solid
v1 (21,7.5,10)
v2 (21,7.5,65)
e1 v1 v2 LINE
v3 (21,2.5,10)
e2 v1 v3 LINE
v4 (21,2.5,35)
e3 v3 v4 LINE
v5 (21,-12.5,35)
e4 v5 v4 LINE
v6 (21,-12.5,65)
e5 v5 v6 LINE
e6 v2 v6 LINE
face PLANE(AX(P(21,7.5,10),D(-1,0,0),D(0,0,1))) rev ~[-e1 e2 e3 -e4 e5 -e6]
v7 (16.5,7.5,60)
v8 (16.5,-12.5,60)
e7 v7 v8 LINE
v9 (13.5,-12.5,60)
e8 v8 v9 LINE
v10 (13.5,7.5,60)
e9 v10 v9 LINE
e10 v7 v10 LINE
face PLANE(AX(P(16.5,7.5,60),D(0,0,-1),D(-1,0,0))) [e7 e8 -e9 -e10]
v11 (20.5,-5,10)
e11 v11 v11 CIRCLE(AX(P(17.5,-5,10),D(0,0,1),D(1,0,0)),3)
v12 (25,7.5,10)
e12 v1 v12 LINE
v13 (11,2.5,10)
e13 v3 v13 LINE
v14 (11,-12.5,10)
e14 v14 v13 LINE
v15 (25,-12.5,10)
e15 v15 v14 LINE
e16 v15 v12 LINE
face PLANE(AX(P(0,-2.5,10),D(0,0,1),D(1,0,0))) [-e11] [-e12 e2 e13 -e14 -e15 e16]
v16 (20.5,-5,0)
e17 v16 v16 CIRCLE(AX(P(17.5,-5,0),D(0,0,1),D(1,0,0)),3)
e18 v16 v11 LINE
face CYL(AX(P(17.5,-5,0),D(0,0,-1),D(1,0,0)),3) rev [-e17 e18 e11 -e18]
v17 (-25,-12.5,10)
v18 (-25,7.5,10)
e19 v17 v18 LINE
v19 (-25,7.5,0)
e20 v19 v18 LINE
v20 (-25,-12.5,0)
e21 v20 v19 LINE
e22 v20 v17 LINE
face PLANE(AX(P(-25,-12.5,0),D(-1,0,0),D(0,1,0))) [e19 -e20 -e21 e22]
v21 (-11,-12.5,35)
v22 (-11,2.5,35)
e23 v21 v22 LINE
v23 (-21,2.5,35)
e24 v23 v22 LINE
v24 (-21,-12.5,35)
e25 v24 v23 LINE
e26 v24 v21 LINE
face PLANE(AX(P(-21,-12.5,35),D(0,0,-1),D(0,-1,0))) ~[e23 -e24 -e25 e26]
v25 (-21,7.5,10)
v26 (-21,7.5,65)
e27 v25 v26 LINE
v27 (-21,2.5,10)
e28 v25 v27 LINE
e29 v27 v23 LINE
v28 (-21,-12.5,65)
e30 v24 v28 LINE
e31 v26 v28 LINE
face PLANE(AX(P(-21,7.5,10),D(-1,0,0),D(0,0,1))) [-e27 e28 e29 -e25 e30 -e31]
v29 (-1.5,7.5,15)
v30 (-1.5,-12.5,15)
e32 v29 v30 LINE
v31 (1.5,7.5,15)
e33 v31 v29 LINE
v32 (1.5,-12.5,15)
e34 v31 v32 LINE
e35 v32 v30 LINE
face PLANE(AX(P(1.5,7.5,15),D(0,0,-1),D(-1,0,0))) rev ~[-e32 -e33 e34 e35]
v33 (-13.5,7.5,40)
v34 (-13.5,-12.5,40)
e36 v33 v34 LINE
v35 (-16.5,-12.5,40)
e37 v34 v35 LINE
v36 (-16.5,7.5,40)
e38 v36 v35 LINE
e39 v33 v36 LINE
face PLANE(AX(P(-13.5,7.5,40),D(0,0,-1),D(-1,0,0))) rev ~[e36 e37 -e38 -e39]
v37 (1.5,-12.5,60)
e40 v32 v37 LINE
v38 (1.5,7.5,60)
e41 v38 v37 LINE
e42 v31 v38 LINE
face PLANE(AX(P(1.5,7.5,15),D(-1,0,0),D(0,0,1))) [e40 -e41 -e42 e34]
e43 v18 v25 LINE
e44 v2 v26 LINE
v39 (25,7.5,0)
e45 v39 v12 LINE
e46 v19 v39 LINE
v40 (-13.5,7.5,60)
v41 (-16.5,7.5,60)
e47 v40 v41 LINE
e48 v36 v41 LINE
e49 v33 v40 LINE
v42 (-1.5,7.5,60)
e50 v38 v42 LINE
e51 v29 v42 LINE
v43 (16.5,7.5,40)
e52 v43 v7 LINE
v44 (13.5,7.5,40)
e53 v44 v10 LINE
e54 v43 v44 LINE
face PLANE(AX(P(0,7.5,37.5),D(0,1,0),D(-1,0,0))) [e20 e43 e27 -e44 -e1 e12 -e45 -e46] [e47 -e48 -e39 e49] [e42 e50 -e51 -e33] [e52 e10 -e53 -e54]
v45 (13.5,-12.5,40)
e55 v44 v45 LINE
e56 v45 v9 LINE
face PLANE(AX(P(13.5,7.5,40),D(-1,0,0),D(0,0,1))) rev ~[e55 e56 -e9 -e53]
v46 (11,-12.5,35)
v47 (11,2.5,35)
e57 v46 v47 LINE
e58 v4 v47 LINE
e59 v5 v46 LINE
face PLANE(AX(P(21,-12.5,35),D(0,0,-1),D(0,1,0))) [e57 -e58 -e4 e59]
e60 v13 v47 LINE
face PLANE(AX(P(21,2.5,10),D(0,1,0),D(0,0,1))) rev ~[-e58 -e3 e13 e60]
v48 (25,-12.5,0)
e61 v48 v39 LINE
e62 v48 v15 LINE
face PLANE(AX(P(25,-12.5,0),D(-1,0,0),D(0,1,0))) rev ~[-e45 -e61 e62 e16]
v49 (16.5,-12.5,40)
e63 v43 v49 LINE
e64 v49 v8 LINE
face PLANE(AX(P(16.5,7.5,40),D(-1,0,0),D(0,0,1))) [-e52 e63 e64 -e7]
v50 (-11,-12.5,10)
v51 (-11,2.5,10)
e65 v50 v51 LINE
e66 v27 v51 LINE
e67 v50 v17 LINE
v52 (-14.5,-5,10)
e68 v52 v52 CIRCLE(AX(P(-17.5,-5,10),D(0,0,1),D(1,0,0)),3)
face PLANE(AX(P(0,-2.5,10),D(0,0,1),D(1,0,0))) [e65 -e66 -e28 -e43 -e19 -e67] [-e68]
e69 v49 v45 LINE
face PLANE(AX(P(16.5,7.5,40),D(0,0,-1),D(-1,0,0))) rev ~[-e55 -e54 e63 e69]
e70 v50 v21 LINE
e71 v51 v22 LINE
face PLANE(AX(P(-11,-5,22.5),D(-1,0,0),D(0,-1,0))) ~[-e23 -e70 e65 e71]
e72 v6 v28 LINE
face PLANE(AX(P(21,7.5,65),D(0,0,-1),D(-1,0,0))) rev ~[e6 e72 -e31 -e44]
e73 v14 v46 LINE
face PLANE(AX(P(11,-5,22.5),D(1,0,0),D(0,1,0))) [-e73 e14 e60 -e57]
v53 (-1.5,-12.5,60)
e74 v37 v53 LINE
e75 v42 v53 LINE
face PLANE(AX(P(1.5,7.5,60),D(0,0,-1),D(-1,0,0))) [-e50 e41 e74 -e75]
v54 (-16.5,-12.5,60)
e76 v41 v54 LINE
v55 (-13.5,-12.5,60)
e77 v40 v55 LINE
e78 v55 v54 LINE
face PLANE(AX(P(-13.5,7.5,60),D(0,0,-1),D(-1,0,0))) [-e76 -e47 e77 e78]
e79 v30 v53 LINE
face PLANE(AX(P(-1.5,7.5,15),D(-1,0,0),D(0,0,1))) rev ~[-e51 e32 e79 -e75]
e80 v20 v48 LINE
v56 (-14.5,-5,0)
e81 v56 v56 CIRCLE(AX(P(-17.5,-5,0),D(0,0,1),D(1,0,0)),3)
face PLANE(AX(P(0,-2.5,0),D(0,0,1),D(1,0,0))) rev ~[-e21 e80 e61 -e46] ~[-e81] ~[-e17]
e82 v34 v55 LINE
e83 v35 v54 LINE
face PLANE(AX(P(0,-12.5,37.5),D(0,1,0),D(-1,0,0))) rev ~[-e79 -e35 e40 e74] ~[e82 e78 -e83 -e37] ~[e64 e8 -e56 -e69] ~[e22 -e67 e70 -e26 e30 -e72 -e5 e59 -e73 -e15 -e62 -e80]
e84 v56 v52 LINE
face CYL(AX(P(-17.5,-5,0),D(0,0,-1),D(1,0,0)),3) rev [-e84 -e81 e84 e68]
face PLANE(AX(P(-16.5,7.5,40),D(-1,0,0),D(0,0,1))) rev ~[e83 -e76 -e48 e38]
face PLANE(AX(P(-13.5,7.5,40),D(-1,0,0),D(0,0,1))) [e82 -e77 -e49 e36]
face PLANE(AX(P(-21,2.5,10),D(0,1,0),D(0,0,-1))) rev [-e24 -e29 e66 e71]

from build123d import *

# Parameters (mm, degrees)
F0_W     = 50
F0_H     = 20
F0_R     = 3
F1_DEPTH = 10
F2_W     = 42
F2_H     = 55
F3_DEPTH = 20
F4_W     = 3
F4_H     = 20
F4_H_2   = 45
F5_DEPTH = 20
F6_W     = 15
F6_H     = 25
F7_DEPTH = 10


# Not quite as in the source:
# - a pattern or mirror of a feature is missing from the dataset's text; its kind, count and spacing are read off the source's solid


with BuildPart() as f1:
    # F0 (on Top) → F1 (new body)
    with BuildSketch(Plane.XY):
        with Locations((0, -2.5)):
            Rectangle(F0_W, F0_H)
        with Locations((-17.5, -5)):
            Circle(F0_R, mode=Mode.SUBTRACT)
        with Locations((17.5, -5)):
            Circle(F0_R, mode=Mode.SUBTRACT)
    extrude(amount=F1_DEPTH)

    # F2 (on face) → F3 (join)
    with BuildSketch(Plane(origin=(0, 7.5, 0), x_dir=(-1, 0, 0), z_dir=(0, 1, 0))):
        with Locations((0, 37.5)):
            Rectangle(F2_W, F2_H)
    extrude(amount=-F3_DEPTH)

    # F4 (on face) → F5 (cut, through all)
    with BuildSketch(Plane(origin=(0, 7.5, 0), x_dir=(-1, 0, 0), z_dir=(0, 1, 0))):
        with Locations((-15, 50)):
            Rectangle(F4_W, F4_H)
        with Locations((0, 37.5)):
            Rectangle(F4_W, F4_H_2)
        with Locations((15, 50)):
            Rectangle(F4_W, F4_H)
    extrude(amount=-F5_DEPTH, mode=Mode.SUBTRACT)

    # F6 (on face) → F7 (cut)
    with BuildSketch(Plane.YZ.offset(21)):
        with Locations((-5, 22.5)):
            Rectangle(F6_W, F6_H)
    f7 = extrude(amount=-F7_DEPTH, mode=Mode.SUBTRACT)

    # F7_copies: F7 across plane
    add(f7.mirror(Plane(origin=(0, 0, 0), x_dir=(0, 0, -1), z_dir=(-1, 0, 0))), mode=Mode.SUBTRACT)


solid = f1.part
